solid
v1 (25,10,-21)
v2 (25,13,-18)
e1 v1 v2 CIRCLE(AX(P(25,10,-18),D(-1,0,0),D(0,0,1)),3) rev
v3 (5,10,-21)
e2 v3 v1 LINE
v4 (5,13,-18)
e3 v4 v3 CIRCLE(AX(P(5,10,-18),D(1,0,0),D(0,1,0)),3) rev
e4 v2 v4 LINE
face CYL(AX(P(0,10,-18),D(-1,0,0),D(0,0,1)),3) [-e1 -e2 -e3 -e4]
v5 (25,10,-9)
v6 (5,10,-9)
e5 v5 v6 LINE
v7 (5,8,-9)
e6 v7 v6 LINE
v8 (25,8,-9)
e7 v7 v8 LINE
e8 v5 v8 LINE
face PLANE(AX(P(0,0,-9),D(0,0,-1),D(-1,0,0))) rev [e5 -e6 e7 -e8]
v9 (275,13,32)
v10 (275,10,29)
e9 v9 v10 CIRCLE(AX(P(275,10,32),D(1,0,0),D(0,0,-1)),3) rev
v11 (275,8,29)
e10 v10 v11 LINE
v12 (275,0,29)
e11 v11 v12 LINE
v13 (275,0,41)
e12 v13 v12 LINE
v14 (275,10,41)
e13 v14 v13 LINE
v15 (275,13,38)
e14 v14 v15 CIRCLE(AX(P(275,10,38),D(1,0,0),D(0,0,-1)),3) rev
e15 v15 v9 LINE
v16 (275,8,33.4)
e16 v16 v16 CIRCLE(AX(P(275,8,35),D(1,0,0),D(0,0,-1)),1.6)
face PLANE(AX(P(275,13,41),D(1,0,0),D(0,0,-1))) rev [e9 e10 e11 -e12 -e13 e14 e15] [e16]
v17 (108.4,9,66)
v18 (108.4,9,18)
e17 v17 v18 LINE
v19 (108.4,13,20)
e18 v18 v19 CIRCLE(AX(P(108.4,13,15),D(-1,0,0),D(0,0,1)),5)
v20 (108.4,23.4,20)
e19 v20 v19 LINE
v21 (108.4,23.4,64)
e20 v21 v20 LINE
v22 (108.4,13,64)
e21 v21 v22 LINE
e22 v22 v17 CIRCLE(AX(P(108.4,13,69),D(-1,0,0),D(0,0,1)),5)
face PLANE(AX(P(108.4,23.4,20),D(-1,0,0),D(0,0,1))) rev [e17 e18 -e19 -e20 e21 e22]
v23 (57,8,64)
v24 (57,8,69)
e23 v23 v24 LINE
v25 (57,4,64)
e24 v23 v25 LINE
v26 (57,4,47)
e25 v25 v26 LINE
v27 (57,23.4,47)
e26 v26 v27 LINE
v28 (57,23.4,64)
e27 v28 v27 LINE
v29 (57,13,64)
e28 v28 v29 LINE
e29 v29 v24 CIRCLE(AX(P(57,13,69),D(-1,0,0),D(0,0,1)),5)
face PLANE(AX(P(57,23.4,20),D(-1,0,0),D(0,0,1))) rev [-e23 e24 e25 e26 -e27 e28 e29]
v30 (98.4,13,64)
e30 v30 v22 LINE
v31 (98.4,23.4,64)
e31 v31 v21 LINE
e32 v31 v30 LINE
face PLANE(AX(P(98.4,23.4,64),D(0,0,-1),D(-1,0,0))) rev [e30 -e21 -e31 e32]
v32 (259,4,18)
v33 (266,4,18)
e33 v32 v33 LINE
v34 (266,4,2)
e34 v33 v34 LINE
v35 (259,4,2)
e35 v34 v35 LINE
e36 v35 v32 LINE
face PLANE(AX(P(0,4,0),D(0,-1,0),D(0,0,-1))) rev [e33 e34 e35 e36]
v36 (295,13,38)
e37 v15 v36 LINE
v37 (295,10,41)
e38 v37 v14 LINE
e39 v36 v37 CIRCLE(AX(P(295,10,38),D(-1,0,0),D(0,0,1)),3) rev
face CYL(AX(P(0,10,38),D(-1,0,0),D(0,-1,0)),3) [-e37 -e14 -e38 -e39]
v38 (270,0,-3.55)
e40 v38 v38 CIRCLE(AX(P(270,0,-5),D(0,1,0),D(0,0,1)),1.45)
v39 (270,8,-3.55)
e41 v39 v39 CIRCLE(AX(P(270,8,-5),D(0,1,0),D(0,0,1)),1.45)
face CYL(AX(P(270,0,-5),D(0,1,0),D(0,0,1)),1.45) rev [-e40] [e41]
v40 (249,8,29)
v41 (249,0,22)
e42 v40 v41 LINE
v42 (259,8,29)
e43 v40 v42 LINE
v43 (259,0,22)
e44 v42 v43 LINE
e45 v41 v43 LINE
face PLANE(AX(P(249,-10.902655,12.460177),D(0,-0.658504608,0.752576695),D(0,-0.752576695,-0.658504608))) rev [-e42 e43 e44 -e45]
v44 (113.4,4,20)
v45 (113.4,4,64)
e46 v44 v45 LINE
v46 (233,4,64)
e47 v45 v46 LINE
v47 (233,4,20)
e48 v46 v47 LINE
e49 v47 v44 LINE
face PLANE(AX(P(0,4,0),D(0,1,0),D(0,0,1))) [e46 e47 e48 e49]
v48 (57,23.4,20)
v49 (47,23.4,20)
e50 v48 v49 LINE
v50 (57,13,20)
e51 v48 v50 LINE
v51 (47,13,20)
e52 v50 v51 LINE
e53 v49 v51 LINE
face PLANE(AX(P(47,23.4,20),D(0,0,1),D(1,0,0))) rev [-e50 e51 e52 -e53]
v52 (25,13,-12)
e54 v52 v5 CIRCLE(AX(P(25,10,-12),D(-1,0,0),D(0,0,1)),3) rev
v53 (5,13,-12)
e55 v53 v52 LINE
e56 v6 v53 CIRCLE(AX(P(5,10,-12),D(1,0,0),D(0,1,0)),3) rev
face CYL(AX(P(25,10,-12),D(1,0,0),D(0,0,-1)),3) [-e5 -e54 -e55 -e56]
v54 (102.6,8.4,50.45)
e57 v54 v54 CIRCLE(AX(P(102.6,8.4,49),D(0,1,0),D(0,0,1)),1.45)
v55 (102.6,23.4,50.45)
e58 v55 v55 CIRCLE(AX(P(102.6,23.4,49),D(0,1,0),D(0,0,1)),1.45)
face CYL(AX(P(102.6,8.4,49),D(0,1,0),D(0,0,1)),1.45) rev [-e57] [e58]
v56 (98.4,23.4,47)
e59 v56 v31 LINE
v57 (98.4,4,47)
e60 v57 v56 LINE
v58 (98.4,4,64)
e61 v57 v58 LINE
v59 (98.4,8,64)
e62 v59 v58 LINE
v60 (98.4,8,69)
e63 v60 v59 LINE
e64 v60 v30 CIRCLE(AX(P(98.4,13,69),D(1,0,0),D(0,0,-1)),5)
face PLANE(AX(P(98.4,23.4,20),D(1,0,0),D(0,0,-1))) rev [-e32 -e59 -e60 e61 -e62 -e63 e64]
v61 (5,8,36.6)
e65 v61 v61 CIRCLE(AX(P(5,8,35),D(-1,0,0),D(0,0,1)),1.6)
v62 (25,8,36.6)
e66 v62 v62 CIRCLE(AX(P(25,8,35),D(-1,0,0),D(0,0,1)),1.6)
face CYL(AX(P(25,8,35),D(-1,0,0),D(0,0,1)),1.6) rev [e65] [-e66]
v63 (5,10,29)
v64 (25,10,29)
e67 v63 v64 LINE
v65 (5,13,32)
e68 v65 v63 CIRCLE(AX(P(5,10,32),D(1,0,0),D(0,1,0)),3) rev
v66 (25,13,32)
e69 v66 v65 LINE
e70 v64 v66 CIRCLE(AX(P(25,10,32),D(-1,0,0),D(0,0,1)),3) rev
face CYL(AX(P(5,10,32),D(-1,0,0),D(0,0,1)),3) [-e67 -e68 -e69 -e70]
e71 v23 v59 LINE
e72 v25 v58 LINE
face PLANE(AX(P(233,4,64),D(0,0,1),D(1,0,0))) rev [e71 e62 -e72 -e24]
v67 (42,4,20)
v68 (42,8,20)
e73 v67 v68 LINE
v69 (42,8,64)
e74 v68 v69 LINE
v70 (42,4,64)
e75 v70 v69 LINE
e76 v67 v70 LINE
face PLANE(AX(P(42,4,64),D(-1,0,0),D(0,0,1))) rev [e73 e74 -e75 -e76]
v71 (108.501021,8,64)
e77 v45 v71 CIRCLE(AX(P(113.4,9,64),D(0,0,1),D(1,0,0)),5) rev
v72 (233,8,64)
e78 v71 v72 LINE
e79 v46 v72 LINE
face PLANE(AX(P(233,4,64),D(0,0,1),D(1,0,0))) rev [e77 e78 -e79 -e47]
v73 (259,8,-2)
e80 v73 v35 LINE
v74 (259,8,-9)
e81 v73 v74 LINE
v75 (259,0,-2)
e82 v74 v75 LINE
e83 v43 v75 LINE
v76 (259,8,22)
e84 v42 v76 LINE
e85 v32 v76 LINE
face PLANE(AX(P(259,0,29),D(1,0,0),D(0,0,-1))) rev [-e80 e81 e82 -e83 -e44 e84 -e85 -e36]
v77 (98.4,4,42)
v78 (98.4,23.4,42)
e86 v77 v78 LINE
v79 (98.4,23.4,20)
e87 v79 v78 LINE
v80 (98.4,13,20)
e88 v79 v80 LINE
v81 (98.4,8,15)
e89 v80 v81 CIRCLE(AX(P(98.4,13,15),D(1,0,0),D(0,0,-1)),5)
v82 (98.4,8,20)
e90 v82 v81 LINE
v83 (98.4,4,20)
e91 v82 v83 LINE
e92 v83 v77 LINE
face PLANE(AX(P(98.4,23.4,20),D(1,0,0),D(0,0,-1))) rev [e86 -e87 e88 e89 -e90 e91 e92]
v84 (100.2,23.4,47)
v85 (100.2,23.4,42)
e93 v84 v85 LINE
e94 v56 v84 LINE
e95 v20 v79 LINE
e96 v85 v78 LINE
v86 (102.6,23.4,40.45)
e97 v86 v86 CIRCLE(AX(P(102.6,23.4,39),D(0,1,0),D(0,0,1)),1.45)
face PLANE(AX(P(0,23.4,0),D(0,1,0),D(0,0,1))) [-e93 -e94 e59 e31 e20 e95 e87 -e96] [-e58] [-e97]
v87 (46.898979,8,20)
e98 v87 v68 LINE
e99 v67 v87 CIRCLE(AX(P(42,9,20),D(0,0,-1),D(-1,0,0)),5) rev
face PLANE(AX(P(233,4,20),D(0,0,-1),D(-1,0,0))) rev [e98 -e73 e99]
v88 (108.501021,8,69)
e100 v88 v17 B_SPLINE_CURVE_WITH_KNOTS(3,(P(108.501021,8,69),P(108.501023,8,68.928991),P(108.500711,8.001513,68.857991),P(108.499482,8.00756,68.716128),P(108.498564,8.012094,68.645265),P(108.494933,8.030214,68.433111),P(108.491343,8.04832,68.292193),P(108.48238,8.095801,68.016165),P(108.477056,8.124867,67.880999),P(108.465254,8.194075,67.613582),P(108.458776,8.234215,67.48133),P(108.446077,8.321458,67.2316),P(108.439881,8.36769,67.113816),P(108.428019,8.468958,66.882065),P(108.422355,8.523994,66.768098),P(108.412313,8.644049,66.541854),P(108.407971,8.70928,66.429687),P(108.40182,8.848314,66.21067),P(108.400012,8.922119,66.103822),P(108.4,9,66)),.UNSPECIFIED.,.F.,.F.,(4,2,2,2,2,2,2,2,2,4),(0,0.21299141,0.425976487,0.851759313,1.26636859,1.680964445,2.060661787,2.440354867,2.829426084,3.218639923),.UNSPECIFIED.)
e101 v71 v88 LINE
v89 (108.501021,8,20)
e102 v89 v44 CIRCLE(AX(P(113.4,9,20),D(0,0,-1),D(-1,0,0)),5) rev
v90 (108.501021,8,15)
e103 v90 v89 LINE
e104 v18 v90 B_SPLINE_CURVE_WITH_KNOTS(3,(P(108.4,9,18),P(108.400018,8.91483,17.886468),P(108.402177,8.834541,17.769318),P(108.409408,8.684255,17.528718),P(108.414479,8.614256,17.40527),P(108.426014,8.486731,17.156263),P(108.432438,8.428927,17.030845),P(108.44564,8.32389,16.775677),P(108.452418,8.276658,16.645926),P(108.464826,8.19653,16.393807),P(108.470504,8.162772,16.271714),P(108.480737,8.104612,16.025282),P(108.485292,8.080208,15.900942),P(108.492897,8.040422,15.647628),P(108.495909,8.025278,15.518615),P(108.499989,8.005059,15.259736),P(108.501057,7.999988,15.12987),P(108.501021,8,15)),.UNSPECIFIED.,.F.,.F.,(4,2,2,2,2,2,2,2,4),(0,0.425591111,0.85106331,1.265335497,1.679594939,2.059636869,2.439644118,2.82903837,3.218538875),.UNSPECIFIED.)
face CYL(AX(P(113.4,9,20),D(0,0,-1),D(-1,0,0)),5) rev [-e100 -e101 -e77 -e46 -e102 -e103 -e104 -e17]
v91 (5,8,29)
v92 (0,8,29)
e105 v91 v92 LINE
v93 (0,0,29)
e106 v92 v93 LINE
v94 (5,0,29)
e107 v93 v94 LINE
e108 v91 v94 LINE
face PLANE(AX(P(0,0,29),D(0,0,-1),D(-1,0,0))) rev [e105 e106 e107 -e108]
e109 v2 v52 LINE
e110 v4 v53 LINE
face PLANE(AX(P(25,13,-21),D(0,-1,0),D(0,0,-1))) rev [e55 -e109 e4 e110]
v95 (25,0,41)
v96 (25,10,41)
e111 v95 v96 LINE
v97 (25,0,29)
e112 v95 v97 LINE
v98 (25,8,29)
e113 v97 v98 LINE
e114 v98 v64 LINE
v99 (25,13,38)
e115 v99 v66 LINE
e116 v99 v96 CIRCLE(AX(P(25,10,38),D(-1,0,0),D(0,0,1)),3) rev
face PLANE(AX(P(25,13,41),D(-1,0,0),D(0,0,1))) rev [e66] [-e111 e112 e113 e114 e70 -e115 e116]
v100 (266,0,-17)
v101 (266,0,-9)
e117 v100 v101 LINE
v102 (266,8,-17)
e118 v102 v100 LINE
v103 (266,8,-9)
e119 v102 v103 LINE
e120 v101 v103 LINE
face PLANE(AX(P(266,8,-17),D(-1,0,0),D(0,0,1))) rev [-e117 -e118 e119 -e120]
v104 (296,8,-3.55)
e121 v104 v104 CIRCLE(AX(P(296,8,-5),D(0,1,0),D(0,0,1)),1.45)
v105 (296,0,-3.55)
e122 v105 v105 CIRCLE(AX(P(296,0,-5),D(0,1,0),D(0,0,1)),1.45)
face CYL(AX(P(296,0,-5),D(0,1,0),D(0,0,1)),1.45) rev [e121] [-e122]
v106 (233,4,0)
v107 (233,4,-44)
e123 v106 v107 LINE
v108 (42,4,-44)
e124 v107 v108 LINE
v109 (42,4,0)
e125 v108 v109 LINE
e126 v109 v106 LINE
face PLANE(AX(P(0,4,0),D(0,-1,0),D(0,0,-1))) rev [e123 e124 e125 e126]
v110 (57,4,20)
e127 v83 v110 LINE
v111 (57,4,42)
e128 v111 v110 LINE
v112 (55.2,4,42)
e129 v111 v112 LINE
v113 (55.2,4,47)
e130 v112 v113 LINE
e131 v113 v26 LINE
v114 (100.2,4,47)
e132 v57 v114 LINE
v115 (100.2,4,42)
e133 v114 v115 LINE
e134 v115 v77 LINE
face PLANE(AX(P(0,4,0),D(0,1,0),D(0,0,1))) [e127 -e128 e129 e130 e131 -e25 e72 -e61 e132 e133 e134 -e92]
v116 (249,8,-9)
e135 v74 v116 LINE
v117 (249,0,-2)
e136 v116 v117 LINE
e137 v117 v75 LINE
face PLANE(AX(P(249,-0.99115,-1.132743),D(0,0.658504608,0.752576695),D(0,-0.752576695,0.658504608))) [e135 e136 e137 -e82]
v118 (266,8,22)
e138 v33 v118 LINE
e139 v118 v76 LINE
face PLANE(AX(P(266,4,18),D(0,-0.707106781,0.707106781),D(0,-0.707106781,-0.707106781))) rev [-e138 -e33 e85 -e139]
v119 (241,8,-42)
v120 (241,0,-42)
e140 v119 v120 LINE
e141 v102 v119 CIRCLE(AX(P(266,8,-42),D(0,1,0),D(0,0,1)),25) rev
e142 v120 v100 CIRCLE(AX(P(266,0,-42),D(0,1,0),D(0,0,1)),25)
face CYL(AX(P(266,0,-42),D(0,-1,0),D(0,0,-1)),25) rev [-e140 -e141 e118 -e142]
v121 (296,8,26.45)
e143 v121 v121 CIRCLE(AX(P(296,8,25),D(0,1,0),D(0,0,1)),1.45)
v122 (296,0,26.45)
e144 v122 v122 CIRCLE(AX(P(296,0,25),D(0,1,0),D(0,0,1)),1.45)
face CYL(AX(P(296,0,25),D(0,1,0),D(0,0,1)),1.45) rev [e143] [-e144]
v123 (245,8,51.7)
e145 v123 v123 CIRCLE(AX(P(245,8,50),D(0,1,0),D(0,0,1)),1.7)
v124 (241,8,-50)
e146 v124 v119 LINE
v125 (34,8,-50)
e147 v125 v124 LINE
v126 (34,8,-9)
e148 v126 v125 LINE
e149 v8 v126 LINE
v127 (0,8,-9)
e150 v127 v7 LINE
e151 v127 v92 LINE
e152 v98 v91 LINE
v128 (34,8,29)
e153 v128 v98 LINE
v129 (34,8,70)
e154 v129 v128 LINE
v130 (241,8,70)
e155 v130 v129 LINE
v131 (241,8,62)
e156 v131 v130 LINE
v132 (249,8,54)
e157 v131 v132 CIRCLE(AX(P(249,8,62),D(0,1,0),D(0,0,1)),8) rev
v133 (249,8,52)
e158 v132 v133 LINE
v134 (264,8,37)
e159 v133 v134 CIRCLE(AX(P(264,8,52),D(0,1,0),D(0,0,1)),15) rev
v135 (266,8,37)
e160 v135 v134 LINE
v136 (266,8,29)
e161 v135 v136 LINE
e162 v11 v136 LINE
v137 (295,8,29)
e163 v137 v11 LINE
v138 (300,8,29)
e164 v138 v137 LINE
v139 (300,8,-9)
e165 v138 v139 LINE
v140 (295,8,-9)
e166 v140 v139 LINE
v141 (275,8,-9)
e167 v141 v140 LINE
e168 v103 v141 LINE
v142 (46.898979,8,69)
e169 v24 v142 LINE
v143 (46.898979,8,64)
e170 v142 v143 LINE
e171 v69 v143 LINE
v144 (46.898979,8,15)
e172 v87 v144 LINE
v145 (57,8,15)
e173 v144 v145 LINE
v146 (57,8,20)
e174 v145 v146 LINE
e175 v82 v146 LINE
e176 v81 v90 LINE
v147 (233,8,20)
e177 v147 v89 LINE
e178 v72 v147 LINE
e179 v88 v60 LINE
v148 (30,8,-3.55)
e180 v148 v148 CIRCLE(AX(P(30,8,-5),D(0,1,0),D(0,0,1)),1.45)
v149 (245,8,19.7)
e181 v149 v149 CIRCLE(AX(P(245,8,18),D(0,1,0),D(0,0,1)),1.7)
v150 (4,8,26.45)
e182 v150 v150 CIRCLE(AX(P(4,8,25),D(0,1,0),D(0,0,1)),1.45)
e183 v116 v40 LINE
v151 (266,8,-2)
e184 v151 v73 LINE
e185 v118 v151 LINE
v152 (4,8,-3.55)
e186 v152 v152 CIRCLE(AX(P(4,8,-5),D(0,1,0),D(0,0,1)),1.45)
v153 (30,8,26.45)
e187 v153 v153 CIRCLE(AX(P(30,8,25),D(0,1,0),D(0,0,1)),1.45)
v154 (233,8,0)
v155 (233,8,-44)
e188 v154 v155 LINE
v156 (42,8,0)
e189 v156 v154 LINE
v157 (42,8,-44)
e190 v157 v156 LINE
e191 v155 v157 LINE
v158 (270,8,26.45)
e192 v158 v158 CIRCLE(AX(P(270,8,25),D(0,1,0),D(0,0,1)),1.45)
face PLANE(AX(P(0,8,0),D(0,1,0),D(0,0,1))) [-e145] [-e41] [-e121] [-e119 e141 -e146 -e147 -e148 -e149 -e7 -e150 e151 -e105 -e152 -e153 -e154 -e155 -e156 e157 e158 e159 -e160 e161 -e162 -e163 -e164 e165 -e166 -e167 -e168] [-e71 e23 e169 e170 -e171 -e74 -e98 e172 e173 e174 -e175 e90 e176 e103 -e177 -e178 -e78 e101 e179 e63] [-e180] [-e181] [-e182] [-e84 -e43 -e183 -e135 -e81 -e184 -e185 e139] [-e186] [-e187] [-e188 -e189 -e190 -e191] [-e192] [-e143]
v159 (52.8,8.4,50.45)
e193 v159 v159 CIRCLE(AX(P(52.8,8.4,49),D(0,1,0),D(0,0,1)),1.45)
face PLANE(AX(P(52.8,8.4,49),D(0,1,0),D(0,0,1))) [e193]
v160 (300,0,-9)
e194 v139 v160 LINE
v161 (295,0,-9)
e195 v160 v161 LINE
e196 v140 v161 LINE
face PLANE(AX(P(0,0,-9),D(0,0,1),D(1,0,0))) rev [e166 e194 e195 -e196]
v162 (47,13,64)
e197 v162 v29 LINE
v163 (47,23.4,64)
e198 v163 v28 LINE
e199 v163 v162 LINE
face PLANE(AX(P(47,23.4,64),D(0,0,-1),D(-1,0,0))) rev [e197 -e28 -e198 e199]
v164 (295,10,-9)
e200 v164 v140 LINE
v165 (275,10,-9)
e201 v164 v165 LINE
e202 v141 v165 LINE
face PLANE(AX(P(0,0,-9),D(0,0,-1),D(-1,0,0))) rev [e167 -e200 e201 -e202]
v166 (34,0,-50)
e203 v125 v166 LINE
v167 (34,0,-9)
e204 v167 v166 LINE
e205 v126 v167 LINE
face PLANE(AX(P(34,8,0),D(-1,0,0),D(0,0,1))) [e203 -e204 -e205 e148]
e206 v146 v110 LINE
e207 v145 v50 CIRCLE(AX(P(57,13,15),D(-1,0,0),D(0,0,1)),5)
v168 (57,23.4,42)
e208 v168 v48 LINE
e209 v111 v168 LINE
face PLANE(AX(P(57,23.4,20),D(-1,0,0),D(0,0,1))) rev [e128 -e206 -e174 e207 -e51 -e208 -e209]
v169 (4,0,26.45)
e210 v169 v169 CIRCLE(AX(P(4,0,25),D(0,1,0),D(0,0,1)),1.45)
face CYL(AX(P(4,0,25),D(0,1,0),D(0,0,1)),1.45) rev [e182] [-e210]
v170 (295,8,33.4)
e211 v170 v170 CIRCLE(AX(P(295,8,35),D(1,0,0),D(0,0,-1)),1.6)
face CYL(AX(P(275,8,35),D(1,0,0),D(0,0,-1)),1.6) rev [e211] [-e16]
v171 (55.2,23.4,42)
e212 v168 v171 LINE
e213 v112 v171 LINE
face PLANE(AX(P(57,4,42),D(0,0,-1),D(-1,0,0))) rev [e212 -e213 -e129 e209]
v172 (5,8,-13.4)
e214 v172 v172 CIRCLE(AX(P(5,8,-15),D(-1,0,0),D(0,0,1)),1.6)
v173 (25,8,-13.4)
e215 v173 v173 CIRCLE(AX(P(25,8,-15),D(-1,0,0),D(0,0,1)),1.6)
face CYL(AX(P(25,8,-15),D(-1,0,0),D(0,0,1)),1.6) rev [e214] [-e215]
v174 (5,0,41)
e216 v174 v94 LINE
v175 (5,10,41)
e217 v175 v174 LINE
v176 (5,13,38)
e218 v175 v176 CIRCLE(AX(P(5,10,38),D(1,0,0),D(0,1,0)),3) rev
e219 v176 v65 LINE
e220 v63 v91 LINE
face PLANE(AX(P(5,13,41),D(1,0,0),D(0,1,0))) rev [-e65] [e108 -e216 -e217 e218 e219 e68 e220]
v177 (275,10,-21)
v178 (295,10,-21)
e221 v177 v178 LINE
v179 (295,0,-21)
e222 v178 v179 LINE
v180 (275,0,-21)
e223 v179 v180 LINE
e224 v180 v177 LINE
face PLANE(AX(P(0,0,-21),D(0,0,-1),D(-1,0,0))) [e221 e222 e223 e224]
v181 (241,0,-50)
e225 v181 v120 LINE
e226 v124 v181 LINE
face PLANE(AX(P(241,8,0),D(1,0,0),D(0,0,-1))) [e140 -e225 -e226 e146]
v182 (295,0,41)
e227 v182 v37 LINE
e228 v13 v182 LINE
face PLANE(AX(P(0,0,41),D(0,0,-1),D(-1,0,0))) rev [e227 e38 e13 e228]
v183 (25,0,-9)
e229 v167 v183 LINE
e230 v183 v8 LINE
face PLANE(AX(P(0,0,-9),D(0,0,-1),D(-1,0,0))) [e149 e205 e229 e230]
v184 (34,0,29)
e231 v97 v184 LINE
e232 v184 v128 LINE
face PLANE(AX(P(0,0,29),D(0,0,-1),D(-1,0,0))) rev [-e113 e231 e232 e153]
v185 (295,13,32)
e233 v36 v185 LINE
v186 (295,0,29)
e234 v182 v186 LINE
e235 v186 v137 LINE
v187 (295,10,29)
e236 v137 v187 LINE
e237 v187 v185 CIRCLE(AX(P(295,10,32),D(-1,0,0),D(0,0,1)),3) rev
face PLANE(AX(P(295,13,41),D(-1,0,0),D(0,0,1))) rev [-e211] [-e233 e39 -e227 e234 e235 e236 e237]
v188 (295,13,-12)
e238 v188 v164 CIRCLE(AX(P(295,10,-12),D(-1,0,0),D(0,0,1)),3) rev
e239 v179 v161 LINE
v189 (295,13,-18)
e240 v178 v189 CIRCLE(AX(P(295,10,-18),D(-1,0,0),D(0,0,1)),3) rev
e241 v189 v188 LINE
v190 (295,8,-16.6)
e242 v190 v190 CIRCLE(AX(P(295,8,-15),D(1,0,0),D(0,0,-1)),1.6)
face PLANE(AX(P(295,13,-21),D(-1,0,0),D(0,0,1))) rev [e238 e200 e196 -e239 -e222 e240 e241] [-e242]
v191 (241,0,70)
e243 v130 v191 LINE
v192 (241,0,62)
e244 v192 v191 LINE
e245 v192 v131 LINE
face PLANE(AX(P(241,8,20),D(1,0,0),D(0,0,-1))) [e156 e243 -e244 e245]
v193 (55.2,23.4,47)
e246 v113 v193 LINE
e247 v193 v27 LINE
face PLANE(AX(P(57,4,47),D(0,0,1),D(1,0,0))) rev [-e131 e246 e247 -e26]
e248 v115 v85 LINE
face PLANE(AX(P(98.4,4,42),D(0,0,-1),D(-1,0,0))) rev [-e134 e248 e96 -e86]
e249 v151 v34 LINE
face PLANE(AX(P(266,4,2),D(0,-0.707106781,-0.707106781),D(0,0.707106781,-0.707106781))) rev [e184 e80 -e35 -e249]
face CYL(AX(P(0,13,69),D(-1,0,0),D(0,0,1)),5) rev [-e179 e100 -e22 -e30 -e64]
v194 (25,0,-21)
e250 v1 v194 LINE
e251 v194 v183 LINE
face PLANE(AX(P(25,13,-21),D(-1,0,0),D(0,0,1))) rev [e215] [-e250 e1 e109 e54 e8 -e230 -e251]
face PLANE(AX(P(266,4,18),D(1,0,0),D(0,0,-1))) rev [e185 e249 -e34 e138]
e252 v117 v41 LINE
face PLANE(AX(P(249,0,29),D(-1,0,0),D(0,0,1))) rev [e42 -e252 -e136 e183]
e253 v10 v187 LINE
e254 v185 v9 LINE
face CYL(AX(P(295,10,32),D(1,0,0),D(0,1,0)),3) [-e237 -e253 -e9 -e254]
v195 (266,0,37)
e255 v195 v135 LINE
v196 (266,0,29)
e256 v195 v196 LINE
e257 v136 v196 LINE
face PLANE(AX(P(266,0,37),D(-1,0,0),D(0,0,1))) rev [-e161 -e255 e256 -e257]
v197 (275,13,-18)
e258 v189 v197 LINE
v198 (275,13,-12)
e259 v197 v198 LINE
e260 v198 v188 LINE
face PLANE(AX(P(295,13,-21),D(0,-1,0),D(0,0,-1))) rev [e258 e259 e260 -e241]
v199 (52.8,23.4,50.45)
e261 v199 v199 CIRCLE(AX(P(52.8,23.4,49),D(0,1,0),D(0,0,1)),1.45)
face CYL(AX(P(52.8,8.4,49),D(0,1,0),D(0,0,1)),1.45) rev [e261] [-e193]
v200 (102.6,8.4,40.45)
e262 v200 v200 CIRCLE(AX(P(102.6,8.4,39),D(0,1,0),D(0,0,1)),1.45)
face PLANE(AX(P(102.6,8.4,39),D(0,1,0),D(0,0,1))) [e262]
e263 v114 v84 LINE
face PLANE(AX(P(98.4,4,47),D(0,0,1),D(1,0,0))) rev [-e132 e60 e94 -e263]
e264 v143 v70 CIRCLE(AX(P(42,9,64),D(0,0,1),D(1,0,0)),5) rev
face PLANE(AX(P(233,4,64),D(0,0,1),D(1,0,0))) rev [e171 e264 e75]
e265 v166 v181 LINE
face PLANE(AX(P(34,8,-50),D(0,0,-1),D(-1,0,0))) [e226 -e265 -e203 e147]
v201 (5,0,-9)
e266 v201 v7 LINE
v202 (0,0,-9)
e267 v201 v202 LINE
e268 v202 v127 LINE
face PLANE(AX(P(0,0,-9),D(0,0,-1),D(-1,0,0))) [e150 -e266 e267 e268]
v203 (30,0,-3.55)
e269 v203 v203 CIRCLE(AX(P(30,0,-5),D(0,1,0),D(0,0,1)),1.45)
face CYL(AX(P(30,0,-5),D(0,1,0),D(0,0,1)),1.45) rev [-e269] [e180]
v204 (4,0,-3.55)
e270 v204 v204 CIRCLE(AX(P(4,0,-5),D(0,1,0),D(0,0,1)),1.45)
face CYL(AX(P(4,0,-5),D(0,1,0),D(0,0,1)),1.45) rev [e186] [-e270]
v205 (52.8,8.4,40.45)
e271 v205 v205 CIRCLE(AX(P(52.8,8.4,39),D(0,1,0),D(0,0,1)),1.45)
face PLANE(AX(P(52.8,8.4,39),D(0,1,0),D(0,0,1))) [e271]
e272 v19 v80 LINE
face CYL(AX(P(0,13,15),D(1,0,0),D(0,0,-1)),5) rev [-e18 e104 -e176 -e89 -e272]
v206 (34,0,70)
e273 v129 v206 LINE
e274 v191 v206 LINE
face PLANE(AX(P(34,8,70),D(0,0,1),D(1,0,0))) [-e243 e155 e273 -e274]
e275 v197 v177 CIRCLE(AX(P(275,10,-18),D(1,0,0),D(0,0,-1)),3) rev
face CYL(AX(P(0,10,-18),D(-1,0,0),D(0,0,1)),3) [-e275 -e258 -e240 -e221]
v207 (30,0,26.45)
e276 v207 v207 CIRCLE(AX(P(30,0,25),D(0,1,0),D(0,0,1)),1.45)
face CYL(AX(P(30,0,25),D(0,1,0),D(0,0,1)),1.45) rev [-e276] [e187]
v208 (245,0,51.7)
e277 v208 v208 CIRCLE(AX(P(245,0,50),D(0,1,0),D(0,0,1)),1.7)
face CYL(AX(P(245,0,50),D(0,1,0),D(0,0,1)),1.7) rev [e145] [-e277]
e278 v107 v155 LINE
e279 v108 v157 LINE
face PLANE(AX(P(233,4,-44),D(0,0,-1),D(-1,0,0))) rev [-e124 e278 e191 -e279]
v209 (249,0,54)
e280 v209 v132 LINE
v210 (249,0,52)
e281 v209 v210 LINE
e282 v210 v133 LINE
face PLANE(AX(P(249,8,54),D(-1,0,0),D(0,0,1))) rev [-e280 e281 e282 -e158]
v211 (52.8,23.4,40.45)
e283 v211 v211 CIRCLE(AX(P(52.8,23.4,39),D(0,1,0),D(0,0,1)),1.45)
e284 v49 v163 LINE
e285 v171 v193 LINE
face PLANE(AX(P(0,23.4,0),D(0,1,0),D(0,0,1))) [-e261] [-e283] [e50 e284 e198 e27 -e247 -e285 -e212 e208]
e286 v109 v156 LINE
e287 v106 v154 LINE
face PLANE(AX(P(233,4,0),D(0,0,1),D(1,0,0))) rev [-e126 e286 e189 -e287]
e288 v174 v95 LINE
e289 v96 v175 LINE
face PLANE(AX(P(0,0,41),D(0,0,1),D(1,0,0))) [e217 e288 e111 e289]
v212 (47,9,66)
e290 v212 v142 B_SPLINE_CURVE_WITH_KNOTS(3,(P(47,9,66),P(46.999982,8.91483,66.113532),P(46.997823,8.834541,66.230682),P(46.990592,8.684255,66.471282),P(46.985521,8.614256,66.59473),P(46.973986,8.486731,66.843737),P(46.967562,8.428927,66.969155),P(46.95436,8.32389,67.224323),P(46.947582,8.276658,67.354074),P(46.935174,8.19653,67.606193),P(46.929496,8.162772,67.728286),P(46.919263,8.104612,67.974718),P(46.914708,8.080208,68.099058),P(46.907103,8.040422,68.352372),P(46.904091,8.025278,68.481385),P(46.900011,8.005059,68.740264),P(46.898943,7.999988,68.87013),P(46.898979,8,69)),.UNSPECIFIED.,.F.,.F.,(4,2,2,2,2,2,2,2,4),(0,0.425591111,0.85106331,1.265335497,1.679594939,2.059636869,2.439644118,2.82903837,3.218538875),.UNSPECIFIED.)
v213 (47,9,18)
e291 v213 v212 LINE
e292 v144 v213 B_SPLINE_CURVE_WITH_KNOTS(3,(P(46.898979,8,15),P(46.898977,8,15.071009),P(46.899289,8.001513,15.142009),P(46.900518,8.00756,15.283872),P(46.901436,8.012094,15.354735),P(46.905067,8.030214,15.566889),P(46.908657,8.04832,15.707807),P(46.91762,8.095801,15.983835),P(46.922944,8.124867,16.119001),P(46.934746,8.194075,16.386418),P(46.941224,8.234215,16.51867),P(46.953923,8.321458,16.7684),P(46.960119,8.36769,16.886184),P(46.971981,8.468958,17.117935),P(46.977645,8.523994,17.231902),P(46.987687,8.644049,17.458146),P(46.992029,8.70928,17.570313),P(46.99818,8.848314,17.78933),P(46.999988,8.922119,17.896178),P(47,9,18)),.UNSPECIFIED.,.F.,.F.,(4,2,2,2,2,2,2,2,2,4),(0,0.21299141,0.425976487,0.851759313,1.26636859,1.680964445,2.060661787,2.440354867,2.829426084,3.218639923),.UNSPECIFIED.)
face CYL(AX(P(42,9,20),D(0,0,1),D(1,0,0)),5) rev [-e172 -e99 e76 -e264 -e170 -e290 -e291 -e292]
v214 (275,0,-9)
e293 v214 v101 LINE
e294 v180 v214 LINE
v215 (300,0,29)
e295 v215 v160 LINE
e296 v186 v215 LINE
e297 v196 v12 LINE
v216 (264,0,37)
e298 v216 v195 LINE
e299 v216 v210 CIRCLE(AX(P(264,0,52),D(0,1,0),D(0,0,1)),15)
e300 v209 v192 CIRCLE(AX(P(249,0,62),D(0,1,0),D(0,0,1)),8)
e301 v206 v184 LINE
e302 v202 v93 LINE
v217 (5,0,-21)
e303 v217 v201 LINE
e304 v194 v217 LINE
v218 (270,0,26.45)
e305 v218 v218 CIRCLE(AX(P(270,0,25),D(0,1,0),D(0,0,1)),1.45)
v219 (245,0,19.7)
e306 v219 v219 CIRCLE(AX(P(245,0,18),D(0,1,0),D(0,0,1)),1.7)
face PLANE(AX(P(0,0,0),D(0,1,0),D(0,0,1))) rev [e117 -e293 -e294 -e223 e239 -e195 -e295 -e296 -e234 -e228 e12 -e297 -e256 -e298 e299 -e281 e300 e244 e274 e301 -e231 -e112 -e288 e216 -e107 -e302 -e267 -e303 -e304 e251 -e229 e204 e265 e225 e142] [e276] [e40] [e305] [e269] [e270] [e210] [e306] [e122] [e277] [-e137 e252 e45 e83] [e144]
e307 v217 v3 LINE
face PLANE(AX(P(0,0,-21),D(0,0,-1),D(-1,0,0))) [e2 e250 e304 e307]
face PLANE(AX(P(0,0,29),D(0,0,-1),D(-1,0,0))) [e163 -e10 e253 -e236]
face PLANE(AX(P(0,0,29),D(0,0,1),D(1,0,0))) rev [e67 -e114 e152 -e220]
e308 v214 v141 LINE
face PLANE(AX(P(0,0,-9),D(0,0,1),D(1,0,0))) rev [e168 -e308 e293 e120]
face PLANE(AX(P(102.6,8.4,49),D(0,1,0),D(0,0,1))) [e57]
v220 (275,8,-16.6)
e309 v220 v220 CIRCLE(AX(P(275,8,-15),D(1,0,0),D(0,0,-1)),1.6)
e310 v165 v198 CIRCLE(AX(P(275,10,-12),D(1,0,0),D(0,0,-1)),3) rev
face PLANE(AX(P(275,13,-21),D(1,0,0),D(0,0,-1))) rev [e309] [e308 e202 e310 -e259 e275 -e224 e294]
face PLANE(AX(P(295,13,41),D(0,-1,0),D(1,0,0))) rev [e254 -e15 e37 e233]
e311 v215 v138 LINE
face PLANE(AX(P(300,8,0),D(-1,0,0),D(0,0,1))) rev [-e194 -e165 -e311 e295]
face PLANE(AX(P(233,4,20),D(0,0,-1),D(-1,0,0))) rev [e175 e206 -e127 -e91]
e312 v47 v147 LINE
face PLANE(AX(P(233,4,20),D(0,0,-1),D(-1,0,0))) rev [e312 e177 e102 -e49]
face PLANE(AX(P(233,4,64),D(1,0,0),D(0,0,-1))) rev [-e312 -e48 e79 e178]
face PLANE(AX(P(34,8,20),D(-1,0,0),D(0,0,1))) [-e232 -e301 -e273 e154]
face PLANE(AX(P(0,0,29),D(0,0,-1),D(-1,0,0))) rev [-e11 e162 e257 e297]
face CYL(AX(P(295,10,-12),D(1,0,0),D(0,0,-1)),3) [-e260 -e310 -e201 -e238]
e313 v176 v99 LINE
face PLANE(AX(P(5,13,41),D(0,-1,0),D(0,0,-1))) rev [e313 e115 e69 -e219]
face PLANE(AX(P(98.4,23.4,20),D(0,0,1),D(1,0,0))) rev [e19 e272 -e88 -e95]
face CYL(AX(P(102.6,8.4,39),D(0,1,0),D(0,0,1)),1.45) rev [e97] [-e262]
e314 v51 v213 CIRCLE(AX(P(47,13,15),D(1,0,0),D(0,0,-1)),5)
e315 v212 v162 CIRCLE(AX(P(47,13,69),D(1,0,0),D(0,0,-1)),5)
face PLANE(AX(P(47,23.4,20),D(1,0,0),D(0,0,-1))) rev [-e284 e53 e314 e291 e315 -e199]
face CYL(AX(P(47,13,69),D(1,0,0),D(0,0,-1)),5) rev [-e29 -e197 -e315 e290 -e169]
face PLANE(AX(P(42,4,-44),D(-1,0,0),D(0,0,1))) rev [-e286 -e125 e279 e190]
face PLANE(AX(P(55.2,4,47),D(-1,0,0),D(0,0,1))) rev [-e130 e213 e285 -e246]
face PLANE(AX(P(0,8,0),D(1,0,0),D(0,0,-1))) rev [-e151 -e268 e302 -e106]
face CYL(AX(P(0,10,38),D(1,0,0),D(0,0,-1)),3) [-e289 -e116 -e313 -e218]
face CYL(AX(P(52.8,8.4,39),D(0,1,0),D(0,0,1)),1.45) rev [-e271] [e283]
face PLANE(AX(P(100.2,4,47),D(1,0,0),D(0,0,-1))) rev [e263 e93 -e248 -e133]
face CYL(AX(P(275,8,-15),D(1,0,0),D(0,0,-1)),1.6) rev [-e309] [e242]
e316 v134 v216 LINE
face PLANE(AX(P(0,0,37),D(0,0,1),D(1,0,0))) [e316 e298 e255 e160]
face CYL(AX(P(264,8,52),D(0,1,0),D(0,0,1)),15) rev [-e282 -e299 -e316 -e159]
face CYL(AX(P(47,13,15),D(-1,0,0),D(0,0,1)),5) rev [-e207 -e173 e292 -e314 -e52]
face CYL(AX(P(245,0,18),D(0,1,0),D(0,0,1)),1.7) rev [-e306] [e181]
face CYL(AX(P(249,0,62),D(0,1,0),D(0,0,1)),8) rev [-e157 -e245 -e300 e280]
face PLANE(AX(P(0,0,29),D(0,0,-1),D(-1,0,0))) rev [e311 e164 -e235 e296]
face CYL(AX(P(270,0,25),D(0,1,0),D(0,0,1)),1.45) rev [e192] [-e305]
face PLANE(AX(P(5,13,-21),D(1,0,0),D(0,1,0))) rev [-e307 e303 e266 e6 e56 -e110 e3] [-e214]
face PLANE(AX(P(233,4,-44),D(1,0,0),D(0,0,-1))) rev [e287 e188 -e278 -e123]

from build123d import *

# Parameters (mm, degrees)
SKETCH1_W            = 300
SKETCH1_H            = 20
BOSS_EXTRUDE1_DEPTH  = 8
SKETCH2_W            = 34
SKETCH2_H            = 8
BOSS_EXTRUDE2_DEPTH  = 9
SKETCH3_W            = 34
SKETCH3_H            = 8
BOSS_EXTRUDE3_DEPTH  = 9
SKETCH4_R            = 1.45
CUT_EXTRUDE1_DEPTH   = 302.504560496
SKETCH5_W            = 25
SKETCH5_H            = 8
BOSS_EXTRUDE4_DEPTH  = 17
SKETCH6_W            = 25
SKETCH6_H            = 8
BOSS_EXTRUDE5_DEPTH  = 17
SKETCH7_W            = 10
SKETCH7_H            = 38
CUT_EXTRUDE2_DEPTH   = 303.37890138
SKETCH8_W            = 7
SKETCH8_H            = 16
CUT_EXTRUDE3_DEPTH   = 4
CUT_EXTRUDE4_DEPTH   = 7
BOSS_EXTRUDE6_DEPTH  = 10
SKETCH12_W           = 8
SKETCH12_H           = 8
BOSS_EXTRUDE7_DEPTH  = 17
SKETCH13_R           = 1.7
CUT_EXTRUDE6_DEPTH   = 305.926220585
SKETCH14_W           = 20
SKETCH14_H           = 13
BOSS_EXTRUDE8_DEPTH  = 12
SKETCH15_R           = 1.6
CUT_EXTRUDE7_DEPTH   = 20
SKETCH16_W           = 20
SKETCH16_H           = 13
BOSS_EXTRUDE9_DEPTH  = 12
SKETCH17_R           = 1.6
CUT_EXTRUDE8_DEPTH   = 20
SKETCH18_W           = 20
SKETCH18_H           = 13
BOSS_EXTRUDE10_DEPTH = 12
CUT_EXTRUDE9_START   = -20
SKETCH19_R           = 1.6
CUT_EXTRUDE9_DEPTH   = 20
SKETCH20_W           = 20
SKETCH20_H           = 13
BOSS_EXTRUDE11_DEPTH = 12
CUT_EXTRUDE10_START  = -20
SKETCH21_R           = 1.6
CUT_EXTRUDE10_DEPTH  = 20
SKETCH22_W           = 207
SKETCH22_H           = 50
BOSS_EXTRUDE12_DEPTH = 8
SKETCH23_W           = 191
SKETCH23_H           = 44
CUT_EXTRUDE11_DEPTH  = 4
SKETCH24_W           = 10
SKETCH24_H           = 44
BOSS_EXTRUDE14_DEPTH = 19.4
SKETCH25_R           = 1.45
CUT_EXTRUDE12_DEPTH  = 15
FILLET1_R            = 5
FILLET2_R            = 5
FILLET3_R            = 8
FILLET4_R            = 15
FILLET5_R            = 25
FILLET6_R            = 3
SKETCH27_W           = 1.8
SKETCH27_H           = 5
CUT_EXTRUDE13_DEPTH  = 19.4


with BuildPart() as part:
    # Sketch1 → Boss-Extrude1 (new body)
    with BuildSketch(Plane(origin=(0, 0, 0), x_dir=(1, 0, 0), z_dir=(0, 1, 0))):
        with Locations((150, -10)):
            Rectangle(SKETCH1_W, SKETCH1_H)
    extrude(amount=BOSS_EXTRUDE1_DEPTH)

    # Sketch2 → Boss-Extrude2 (add)
    with BuildSketch(Plane.XY.offset(20)):
        with Locations((17, 4)):
            Rectangle(SKETCH2_W, SKETCH2_H)
        with Locations((283, 4)):
            Rectangle(SKETCH2_W, SKETCH2_H)
    extrude(amount=BOSS_EXTRUDE2_DEPTH)

    # Sketch3 → Boss-Extrude3 (add)
    with BuildSketch(Plane(origin=(0, 0, 0), x_dir=(-1, 0, 0), z_dir=(0, 0, -1))):
        with Locations((-17, 4)):
            Rectangle(SKETCH3_W, SKETCH3_H)
        with Locations((-283, 4)):
            Rectangle(SKETCH3_W, SKETCH3_H)
    extrude(amount=BOSS_EXTRUDE3_DEPTH)

    # Sketch4 → Cut-Extrude1 (cut, through all)
    with BuildSketch(Plane(origin=(0, 8, 0), x_dir=(1, 0, 0), z_dir=(0, 1, 0))):
        with Locations(Location((4, 5, 0), (0, 0, 270))):
            Circle(SKETCH4_R)
        with Locations(Location((30, 5, 0), (0, 0, 270))):
            Circle(SKETCH4_R)
        with Locations(Location((30, -25, 0), (0, 0, 270))):
            Circle(SKETCH4_R)
        with Locations(Location((4, -25, 0), (0, 0, 270))):
            Circle(SKETCH4_R)
        with Locations(Location((296, -25, 0), (0, 0, 270))):
            Circle(SKETCH4_R)
        with Locations(Location((296, 5, 0), (0, 0, 270))):
            Circle(SKETCH4_R)
        with Locations(Location((270, -25, 0), (0, 0, 270))):
            Circle(SKETCH4_R)
        with Locations(Location((270, 5, 0), (0, 0, 270))):
            Circle(SKETCH4_R)
    extrude(amount=-CUT_EXTRUDE1_DEPTH, mode=Mode.SUBTRACT)

    # Sketch5 → Boss-Extrude4 (add)
    with BuildSketch(Plane.XY.offset(20)):
        with Locations((253.5, 4)):
            Rectangle(SKETCH5_W, SKETCH5_H)
    extrude(amount=BOSS_EXTRUDE4_DEPTH)

    # Sketch6 → Boss-Extrude5 (add)
    with BuildSketch(Plane(origin=(0, 0, 0), x_dir=(-1, 0, 0), z_dir=(0, 0, -1))):
        with Locations((-253.5, 4)):
            Rectangle(SKETCH6_W, SKETCH6_H)
    extrude(amount=BOSS_EXTRUDE5_DEPTH)

    # Sketch7 → Cut-Extrude2 (cut, through all)
    with BuildSketch(Plane(origin=(0, 8, 0), x_dir=(1, 0, 0), z_dir=(0, 1, 0))):
        with Locations((254, -10)):
            Rectangle(SKETCH7_W, SKETCH7_H)
    extrude(amount=-CUT_EXTRUDE2_DEPTH, mode=Mode.SUBTRACT)

    # Sketch8 → Cut-Extrude3 (cut)
    with BuildSketch(Plane(origin=(0, 8, 0), x_dir=(1, 0, 0), z_dir=(0, 1, 0))):
        with Locations((262.5, -10)):
            Rectangle(SKETCH8_W, SKETCH8_H)
    extrude(amount=-CUT_EXTRUDE3_DEPTH, mode=Mode.SUBTRACT)

    # Sketch9 → Cut-Extrude4 (cut)
    with BuildSketch(Plane.ZY.offset(-259)):
        Polygon((18, 4), (22, 8), (18, 8), align=None)
        Polygon((2, 4), (-2, 8), (2, 8), align=None)
    extrude(amount=-CUT_EXTRUDE4_DEPTH, mode=Mode.SUBTRACT)

    # Sketch10 → Boss-Extrude6 (add)
    with BuildSketch(Plane.ZY.offset(-259)):
        Polygon((-2, 0), (-9, 8), (-9, 0), align=None)
        Polygon((29, 8), (22, 0), (29, 0), align=None)
    extrude(amount=BOSS_EXTRUDE6_DEPTH)

    # Sketch12 → Boss-Extrude7 (add)
    with BuildSketch(Plane.XY.offset(37)):
        with Locations((245, 4)):
            Rectangle(SKETCH12_W, SKETCH12_H)
    extrude(amount=BOSS_EXTRUDE7_DEPTH)

    # Sketch13 → Cut-Extrude6 (cut, through all)
    with BuildSketch(Plane(origin=(0, 8, 0), x_dir=(1, 0, 0), z_dir=(0, 1, 0))):
        with Locations(Location((245, -50, 0), (0, 0, 270))):
            Circle(SKETCH13_R)
        with Locations(Location((245, -18, 0), (0, 0, 270))):
            Circle(SKETCH13_R)
    extrude(amount=-CUT_EXTRUDE6_DEPTH, mode=Mode.SUBTRACT)

    # Sketch14 → Boss-Extrude8 (add)
    with BuildSketch(Plane.XY.offset(29)):
        with Locations((285, 6.5)):
            Rectangle(SKETCH14_W, SKETCH14_H)
    extrude(amount=BOSS_EXTRUDE8_DEPTH)

    # Sketch15 → Cut-Extrude7 (cut)
    with BuildSketch(Plane(origin=(295, 0, 0), x_dir=(0, 0, -1), z_dir=(1, 0, 0))):
        with Locations((-35, 8)):
            Circle(SKETCH15_R)
    extrude(amount=-CUT_EXTRUDE7_DEPTH, mode=Mode.SUBTRACT)

    # Sketch16 → Boss-Extrude9 (add)
    with BuildSketch(Plane(origin=(0, 0, -9), x_dir=(-1, 0, 0), z_dir=(0, 0, -1))):
        with Locations((-285, 6.5)):
            Rectangle(SKETCH16_W, SKETCH16_H)
    extrude(amount=BOSS_EXTRUDE9_DEPTH)

    # Sketch17 → Cut-Extrude8 (cut)
    with BuildSketch(Plane(origin=(295, 0, 0), x_dir=(0, 0, -1), z_dir=(1, 0, 0))):
        with Locations((15, 8)):
            Circle(SKETCH17_R)
    extrude(amount=-CUT_EXTRUDE8_DEPTH, mode=Mode.SUBTRACT)

    # Sketch18 → Boss-Extrude10 (add)
    with BuildSketch(Plane(origin=(0, 0, -9), x_dir=(-1, 0, 0), z_dir=(0, 0, -1))):
        with Locations((-15, 6.5)):
            Rectangle(SKETCH18_W, SKETCH18_H)
    extrude(amount=BOSS_EXTRUDE10_DEPTH)

    # Sketch19 → Cut-Extrude9 (cut)
    with BuildSketch(Plane.ZY.offset(-5).offset(CUT_EXTRUDE9_START)):
        with Locations(Location((-15, 8, 0), (0, 0, 180))):
            Circle(SKETCH19_R)
    extrude(amount=CUT_EXTRUDE9_DEPTH, mode=Mode.SUBTRACT)

    # Sketch20 → Boss-Extrude11 (add)
    with BuildSketch(Plane.XY.offset(29)):
        with Locations((15, 6.5)):
            Rectangle(SKETCH20_W, SKETCH20_H)
    extrude(amount=BOSS_EXTRUDE11_DEPTH)

    # Sketch21 → Cut-Extrude10 (cut)
    with BuildSketch(Plane.ZY.offset(-5).offset(CUT_EXTRUDE10_START)):
        with Locations(Location((35, 8, 0), (0, 0, 180))):
            Circle(SKETCH21_R)
    extrude(amount=CUT_EXTRUDE10_DEPTH, mode=Mode.SUBTRACT)

    # Sketch22 → Boss-Extrude12 (add)
    with BuildSketch(Plane(origin=(0, 0, 0), x_dir=(-1, 0, 0), z_dir=(0, -1, 0))):
        with Locations((-137.5, -45)):
            Rectangle(SKETCH22_W, SKETCH22_H)
        with Locations((-137.5, 25)):
            Rectangle(SKETCH22_W, SKETCH22_H)
    extrude(amount=-BOSS_EXTRUDE12_DEPTH)

    # Sketch23 → Cut-Extrude11 (cut)
    with BuildSketch(Plane(origin=(0, 8, 0), x_dir=(1, 0, 0), z_dir=(0, 1, 0))):
        with Locations((137.5, -42)):
            Rectangle(SKETCH23_W, SKETCH23_H)
        with Locations((137.5, 22)):
            Rectangle(SKETCH23_W, SKETCH23_H)
    extrude(amount=-CUT_EXTRUDE11_DEPTH, mode=Mode.SUBTRACT)

    # Sketch24 → Boss-Extrude14 (add)
    with BuildSketch(Plane(origin=(0, 4, 0), x_dir=(1, 0, 0), z_dir=(0, 1, 0))):
        with Locations((103.4, -42)):
            Rectangle(SKETCH24_W, SKETCH24_H)
        with Locations((52, -42)):
            Rectangle(SKETCH24_W, SKETCH24_H)
    extrude(amount=BOSS_EXTRUDE14_DEPTH)

    # Sketch25 → Cut-Extrude12 (cut)
    with BuildSketch(Plane(origin=(0, 23.4, 0), x_dir=(1, 0, 0), z_dir=(0, 1, 0))):
        with Locations(Location((102.6, -49, 0), (0, 0, 270))):
            Circle(SKETCH25_R)
        with Locations(Location((102.6, -39, 0), (0, 0, 270))):
            Circle(SKETCH25_R)
        with Locations(Location((52.8, -49, 0), (0, 0, 270))):
            Circle(SKETCH25_R)
        with Locations(Location((52.8, -39, 0), (0, 0, 270))):
            Circle(SKETCH25_R)
    extrude(amount=-CUT_EXTRUDE12_DEPTH, mode=Mode.SUBTRACT)

    # Fillet1
    fillet1_edges = [part.edges().sort_by_distance(p)[0] for p in [
        (103.4, 8, 64),
        (103.4, 8, 20),
        (52, 8, 64),
        (52, 8, 20),
    ]]
    fillet(fillet1_edges, radius=FILLET1_R)

    # Fillet2
    fillet2_edges = [part.edges().sort_by_distance(p)[0] for p in [
        (47, 4, 42),
        (108.4, 4, 42),
    ]]
    fillet(fillet2_edges, radius=FILLET2_R - 0.0001)  # a hair under: the kernel refuses the full size

    # Fillet3
    fillet3_edges = [part.edges().sort_by_distance(p)[0] for p in [
        (241, 4, 54),
    ]]
    fillet(fillet3_edges, radius=FILLET3_R - 0.0001)  # a hair under: the kernel refuses the full size

    # Fillet4
    fillet4_edges = [part.edges().sort_by_distance(p)[0] for p in [
        (249, 4, 37),
    ]]
    fillet(fillet4_edges, radius=FILLET4_R)

    # Fillet5
    fillet5_edges = [part.edges().sort_by_distance(p)[0] for p in [
        (241, 4, -17),
    ]]
    fillet(fillet5_edges, radius=FILLET5_R - 0.0001)  # a hair under: the kernel refuses the full size

    # Fillet6
    fillet6_edges = [part.edges().sort_by_distance(p)[0] for p in [
        (285, 13, 29),
        (285, 13, 41),
        (285, 13, -9),
        (285, 13, -21),
        (15, 13, -9),
        (15, 13, -21),
        (15, 13, 29),
        (15, 13, 41),
    ]]
    fillet(fillet6_edges, radius=FILLET6_R)

    # Sketch27 → Cut-Extrude13 (cut)
    with BuildSketch(Plane(origin=(0, 23.4, 0), x_dir=(1, 0, 0), z_dir=(0, 1, 0))):
        with Locations((56.1, -44.5)):
            Rectangle(SKETCH27_W, SKETCH27_H)
        with Locations((99.3, -44.5)):
            Rectangle(SKETCH27_W, SKETCH27_H)
    extrude(amount=-CUT_EXTRUDE13_DEPTH, mode=Mode.SUBTRACT)


solid = part.part
